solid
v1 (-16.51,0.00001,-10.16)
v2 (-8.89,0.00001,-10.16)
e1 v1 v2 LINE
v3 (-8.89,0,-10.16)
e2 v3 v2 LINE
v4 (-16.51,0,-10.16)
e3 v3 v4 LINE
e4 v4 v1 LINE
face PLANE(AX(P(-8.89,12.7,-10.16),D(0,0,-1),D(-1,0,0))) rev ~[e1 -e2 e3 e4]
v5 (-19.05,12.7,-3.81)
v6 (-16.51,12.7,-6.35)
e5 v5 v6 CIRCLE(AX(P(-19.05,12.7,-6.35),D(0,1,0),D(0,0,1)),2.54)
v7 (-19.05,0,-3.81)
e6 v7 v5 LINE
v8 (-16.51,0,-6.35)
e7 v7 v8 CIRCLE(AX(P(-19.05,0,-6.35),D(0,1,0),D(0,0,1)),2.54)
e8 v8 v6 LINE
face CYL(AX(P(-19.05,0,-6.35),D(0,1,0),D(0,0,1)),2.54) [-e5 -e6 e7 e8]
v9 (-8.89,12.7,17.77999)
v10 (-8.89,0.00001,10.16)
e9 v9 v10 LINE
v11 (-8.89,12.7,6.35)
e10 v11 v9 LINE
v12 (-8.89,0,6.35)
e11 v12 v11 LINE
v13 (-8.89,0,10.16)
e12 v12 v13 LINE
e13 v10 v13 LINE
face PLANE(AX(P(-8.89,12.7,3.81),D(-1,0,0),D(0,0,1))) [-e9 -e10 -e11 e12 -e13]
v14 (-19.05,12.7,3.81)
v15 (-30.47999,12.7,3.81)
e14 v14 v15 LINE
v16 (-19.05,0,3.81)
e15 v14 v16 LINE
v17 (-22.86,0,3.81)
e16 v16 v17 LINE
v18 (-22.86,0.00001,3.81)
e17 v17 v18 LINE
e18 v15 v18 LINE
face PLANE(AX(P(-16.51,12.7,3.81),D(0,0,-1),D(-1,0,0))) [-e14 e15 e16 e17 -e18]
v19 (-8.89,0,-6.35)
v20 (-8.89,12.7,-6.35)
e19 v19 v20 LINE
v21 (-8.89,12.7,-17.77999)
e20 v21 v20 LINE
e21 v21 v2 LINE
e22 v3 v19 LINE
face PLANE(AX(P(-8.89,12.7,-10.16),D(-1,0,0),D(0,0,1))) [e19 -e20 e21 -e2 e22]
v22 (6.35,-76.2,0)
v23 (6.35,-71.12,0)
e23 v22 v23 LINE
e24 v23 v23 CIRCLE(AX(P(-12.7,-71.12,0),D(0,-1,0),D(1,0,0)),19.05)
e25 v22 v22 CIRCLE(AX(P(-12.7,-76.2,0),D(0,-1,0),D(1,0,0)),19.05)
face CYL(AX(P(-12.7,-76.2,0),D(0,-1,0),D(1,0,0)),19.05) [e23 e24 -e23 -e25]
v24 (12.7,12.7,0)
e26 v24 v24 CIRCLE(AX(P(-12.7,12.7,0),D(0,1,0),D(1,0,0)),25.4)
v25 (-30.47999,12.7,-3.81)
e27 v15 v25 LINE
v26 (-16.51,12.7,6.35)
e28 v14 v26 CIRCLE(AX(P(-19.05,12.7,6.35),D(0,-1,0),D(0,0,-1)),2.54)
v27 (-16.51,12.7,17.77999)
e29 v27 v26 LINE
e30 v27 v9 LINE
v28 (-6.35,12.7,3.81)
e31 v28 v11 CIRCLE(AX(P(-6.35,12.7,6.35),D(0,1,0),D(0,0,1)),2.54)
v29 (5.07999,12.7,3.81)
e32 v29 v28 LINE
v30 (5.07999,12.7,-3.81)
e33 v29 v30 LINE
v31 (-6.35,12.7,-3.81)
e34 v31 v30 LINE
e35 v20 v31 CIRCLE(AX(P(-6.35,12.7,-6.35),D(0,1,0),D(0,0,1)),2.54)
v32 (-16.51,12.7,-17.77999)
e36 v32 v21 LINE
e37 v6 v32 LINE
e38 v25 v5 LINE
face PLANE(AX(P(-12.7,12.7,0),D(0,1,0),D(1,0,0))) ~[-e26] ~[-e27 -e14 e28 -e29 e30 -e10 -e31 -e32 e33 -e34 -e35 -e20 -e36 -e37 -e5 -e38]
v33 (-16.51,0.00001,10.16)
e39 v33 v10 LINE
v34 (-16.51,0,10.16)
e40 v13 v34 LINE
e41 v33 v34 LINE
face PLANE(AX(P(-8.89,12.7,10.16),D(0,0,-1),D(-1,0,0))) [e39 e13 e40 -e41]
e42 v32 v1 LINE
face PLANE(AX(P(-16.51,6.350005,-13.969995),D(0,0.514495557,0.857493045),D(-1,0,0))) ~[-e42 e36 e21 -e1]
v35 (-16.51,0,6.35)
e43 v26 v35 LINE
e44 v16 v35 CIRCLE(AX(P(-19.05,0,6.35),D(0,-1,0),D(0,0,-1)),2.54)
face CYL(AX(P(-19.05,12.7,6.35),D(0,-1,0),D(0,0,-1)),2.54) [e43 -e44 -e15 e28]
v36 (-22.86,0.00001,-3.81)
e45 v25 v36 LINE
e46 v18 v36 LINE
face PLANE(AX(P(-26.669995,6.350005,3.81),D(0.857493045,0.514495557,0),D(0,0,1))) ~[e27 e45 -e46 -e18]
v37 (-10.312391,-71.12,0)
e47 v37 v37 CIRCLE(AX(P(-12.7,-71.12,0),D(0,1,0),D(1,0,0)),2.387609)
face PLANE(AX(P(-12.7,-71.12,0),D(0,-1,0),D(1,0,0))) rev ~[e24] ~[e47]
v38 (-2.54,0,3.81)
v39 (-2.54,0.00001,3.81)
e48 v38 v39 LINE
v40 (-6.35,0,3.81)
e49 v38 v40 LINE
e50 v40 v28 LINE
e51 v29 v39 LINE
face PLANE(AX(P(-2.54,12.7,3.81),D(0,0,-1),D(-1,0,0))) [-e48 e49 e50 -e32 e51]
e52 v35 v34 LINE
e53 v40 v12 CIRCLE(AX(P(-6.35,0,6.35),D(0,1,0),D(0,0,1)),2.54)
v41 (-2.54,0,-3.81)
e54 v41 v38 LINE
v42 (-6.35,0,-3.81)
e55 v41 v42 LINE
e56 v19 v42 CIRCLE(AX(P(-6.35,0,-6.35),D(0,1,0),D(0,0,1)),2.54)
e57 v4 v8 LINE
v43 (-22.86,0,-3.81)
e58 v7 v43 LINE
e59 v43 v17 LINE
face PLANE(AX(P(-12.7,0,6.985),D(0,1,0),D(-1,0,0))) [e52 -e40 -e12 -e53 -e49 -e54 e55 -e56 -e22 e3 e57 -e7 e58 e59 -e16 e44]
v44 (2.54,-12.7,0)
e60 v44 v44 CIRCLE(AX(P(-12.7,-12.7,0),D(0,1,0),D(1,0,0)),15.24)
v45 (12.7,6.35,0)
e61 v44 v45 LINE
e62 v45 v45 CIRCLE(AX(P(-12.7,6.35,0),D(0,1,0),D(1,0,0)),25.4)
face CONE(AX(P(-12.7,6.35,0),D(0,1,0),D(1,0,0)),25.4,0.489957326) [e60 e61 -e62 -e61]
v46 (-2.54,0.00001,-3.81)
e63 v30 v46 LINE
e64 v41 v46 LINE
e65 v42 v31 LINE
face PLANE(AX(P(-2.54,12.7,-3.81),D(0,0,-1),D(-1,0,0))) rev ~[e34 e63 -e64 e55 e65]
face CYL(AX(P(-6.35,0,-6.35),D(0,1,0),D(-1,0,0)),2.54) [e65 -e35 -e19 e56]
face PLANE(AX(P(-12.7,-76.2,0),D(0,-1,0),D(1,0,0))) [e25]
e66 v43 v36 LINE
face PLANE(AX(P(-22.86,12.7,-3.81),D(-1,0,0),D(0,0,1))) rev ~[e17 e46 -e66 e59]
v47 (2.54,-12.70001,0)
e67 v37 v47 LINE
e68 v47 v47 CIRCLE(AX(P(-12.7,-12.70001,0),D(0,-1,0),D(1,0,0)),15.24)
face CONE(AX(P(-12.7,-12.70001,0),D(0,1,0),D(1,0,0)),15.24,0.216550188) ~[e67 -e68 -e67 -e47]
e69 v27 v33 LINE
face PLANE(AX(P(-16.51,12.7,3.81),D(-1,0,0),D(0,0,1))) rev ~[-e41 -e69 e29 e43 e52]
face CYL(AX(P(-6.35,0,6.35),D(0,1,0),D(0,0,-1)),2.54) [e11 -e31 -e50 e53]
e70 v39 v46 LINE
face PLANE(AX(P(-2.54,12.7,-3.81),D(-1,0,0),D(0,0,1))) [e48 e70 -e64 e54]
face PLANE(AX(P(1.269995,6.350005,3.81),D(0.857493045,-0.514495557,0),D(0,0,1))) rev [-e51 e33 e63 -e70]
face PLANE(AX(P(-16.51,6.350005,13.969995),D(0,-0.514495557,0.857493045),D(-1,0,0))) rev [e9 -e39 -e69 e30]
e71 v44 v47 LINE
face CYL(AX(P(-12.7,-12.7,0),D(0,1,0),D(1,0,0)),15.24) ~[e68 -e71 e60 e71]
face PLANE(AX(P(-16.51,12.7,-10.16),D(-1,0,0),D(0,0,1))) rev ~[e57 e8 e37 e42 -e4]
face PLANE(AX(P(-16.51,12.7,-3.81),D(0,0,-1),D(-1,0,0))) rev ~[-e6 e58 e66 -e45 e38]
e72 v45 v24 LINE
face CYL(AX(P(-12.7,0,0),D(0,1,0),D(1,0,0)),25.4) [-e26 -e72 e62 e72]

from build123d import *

# Parameters (mm, degrees)
F0_W      = 25.4
F0_H      = 25.4
F2_SIZE2  = 19.05
F2_SIZE   = 10.16
F3_W      = 7.62
F3_H      = 6.35
F3_W_2    = 6.35
F3_H_2    = 7.62
F4_DEPTH  = 12.7
F5_SIZE2  = 12.69999
F5_SIZE   = 7.61999
F6_R      = 2.54
F7_R      = 15.24
F8_DEPTH  = 63.5
F9_SIZE2  = 63.49999
F9_SIZE   = 13.96999
F10_R     = 19.05
F10_R_2   = 1.27001
F11_DEPTH = 5.08


# Not quite as in the source:
# - a fillet or chamfer is up to 0.001 mm smaller than in the source, because OpenCascade refuses the exact size


with BuildPart() as f1:
    # F0 (on Top) → F1 (revolve)
    with BuildSketch(Plane.XY):
        Rectangle(F0_W, F0_H)
    revolve(axis=Axis((-12.7, 0, 0), (0, 1, 0)))

    # F2
    f2_edges = [f1.edges().sort_by_distance(p)[0] for p in [
        (-38.1, -12.7, 0),
    ]]
    chamfer(f2_edges, length=F2_SIZE, length2=F2_SIZE2)

    # F3 (on face) → F4 (cut, symmetric)
    with BuildSketch(Plane(origin=(0, 12.7, 0), x_dir=(-1, 0, 0), z_dir=(0, 1, 0))):
        with Locations((12.7, 6.985)):
            Rectangle(F3_W, F3_H)
        with Locations((5.715, 0)):
            Rectangle(F3_W_2, F3_H_2)
        with Locations((12.7, 0)):
            Rectangle(F3_W, F3_H_2)
        with Locations((19.685, 0)):
            Rectangle(F3_W_2, F3_H_2)
        with Locations((12.7, -6.985)):
            Rectangle(F3_W, F3_H)
    extrude(amount=F4_DEPTH, both=True, mode=Mode.SUBTRACT)

    # F5 (size 7.62 and 12.7 in the source; OpenCascade refuses exactly that, so slightly less here)
    f5_edges = [f1.edges().sort_by_distance(p)[0] for p in [
        (-12.7, 12.7, 10.16),
        (-2.54, 12.7, 0),
        (-22.86, 12.7, 0),
        (-12.7, 12.7, -10.16),
    ]]
    chamfer(f5_edges, length=F5_SIZE, length2=F5_SIZE2)

    # F6
    f6_edges = [f1.edges().sort_by_distance(p)[0] for p in [
        (-8.89, 6.35, -3.81),
        (-16.51, 6.35, -3.81),
        (-8.89, 6.35, 3.81),
        (-16.51, 6.35, 3.81),
    ]]
    fillet(f6_edges, radius=F6_R)

    # F7 (on face) → F8 (join)
    with BuildSketch(Plane.XZ.offset(12.7)):
        with Locations((-12.7, 0)):
            Circle(F7_R)
    extrude(amount=F8_DEPTH)

    # F9 (size 13.97 and 63.5 in the source; OpenCascade refuses exactly that, so slightly less here)
    f9_edges = [f1.edges().sort_by_distance(p)[0] for p in [
        (-27.94, -76.2, 0),
    ]]
    f9_side = f1.faces().sort_by_distance((-12.7, -76.2, 0))[0]
    chamfer(f9_edges, length=F9_SIZE, length2=F9_SIZE2, reference=f9_side)

    # F10 (on face) → F11 (join)
    with BuildSketch(Plane.XZ.offset(76.2)):
        with Locations((-12.7, 0)):
            Circle(F10_R)
        with Locations((-12.7, 0)):
            Circle(F10_R_2, mode=Mode.SUBTRACT)
    extrude(amount=-F11_DEPTH)


solid = f1.part
